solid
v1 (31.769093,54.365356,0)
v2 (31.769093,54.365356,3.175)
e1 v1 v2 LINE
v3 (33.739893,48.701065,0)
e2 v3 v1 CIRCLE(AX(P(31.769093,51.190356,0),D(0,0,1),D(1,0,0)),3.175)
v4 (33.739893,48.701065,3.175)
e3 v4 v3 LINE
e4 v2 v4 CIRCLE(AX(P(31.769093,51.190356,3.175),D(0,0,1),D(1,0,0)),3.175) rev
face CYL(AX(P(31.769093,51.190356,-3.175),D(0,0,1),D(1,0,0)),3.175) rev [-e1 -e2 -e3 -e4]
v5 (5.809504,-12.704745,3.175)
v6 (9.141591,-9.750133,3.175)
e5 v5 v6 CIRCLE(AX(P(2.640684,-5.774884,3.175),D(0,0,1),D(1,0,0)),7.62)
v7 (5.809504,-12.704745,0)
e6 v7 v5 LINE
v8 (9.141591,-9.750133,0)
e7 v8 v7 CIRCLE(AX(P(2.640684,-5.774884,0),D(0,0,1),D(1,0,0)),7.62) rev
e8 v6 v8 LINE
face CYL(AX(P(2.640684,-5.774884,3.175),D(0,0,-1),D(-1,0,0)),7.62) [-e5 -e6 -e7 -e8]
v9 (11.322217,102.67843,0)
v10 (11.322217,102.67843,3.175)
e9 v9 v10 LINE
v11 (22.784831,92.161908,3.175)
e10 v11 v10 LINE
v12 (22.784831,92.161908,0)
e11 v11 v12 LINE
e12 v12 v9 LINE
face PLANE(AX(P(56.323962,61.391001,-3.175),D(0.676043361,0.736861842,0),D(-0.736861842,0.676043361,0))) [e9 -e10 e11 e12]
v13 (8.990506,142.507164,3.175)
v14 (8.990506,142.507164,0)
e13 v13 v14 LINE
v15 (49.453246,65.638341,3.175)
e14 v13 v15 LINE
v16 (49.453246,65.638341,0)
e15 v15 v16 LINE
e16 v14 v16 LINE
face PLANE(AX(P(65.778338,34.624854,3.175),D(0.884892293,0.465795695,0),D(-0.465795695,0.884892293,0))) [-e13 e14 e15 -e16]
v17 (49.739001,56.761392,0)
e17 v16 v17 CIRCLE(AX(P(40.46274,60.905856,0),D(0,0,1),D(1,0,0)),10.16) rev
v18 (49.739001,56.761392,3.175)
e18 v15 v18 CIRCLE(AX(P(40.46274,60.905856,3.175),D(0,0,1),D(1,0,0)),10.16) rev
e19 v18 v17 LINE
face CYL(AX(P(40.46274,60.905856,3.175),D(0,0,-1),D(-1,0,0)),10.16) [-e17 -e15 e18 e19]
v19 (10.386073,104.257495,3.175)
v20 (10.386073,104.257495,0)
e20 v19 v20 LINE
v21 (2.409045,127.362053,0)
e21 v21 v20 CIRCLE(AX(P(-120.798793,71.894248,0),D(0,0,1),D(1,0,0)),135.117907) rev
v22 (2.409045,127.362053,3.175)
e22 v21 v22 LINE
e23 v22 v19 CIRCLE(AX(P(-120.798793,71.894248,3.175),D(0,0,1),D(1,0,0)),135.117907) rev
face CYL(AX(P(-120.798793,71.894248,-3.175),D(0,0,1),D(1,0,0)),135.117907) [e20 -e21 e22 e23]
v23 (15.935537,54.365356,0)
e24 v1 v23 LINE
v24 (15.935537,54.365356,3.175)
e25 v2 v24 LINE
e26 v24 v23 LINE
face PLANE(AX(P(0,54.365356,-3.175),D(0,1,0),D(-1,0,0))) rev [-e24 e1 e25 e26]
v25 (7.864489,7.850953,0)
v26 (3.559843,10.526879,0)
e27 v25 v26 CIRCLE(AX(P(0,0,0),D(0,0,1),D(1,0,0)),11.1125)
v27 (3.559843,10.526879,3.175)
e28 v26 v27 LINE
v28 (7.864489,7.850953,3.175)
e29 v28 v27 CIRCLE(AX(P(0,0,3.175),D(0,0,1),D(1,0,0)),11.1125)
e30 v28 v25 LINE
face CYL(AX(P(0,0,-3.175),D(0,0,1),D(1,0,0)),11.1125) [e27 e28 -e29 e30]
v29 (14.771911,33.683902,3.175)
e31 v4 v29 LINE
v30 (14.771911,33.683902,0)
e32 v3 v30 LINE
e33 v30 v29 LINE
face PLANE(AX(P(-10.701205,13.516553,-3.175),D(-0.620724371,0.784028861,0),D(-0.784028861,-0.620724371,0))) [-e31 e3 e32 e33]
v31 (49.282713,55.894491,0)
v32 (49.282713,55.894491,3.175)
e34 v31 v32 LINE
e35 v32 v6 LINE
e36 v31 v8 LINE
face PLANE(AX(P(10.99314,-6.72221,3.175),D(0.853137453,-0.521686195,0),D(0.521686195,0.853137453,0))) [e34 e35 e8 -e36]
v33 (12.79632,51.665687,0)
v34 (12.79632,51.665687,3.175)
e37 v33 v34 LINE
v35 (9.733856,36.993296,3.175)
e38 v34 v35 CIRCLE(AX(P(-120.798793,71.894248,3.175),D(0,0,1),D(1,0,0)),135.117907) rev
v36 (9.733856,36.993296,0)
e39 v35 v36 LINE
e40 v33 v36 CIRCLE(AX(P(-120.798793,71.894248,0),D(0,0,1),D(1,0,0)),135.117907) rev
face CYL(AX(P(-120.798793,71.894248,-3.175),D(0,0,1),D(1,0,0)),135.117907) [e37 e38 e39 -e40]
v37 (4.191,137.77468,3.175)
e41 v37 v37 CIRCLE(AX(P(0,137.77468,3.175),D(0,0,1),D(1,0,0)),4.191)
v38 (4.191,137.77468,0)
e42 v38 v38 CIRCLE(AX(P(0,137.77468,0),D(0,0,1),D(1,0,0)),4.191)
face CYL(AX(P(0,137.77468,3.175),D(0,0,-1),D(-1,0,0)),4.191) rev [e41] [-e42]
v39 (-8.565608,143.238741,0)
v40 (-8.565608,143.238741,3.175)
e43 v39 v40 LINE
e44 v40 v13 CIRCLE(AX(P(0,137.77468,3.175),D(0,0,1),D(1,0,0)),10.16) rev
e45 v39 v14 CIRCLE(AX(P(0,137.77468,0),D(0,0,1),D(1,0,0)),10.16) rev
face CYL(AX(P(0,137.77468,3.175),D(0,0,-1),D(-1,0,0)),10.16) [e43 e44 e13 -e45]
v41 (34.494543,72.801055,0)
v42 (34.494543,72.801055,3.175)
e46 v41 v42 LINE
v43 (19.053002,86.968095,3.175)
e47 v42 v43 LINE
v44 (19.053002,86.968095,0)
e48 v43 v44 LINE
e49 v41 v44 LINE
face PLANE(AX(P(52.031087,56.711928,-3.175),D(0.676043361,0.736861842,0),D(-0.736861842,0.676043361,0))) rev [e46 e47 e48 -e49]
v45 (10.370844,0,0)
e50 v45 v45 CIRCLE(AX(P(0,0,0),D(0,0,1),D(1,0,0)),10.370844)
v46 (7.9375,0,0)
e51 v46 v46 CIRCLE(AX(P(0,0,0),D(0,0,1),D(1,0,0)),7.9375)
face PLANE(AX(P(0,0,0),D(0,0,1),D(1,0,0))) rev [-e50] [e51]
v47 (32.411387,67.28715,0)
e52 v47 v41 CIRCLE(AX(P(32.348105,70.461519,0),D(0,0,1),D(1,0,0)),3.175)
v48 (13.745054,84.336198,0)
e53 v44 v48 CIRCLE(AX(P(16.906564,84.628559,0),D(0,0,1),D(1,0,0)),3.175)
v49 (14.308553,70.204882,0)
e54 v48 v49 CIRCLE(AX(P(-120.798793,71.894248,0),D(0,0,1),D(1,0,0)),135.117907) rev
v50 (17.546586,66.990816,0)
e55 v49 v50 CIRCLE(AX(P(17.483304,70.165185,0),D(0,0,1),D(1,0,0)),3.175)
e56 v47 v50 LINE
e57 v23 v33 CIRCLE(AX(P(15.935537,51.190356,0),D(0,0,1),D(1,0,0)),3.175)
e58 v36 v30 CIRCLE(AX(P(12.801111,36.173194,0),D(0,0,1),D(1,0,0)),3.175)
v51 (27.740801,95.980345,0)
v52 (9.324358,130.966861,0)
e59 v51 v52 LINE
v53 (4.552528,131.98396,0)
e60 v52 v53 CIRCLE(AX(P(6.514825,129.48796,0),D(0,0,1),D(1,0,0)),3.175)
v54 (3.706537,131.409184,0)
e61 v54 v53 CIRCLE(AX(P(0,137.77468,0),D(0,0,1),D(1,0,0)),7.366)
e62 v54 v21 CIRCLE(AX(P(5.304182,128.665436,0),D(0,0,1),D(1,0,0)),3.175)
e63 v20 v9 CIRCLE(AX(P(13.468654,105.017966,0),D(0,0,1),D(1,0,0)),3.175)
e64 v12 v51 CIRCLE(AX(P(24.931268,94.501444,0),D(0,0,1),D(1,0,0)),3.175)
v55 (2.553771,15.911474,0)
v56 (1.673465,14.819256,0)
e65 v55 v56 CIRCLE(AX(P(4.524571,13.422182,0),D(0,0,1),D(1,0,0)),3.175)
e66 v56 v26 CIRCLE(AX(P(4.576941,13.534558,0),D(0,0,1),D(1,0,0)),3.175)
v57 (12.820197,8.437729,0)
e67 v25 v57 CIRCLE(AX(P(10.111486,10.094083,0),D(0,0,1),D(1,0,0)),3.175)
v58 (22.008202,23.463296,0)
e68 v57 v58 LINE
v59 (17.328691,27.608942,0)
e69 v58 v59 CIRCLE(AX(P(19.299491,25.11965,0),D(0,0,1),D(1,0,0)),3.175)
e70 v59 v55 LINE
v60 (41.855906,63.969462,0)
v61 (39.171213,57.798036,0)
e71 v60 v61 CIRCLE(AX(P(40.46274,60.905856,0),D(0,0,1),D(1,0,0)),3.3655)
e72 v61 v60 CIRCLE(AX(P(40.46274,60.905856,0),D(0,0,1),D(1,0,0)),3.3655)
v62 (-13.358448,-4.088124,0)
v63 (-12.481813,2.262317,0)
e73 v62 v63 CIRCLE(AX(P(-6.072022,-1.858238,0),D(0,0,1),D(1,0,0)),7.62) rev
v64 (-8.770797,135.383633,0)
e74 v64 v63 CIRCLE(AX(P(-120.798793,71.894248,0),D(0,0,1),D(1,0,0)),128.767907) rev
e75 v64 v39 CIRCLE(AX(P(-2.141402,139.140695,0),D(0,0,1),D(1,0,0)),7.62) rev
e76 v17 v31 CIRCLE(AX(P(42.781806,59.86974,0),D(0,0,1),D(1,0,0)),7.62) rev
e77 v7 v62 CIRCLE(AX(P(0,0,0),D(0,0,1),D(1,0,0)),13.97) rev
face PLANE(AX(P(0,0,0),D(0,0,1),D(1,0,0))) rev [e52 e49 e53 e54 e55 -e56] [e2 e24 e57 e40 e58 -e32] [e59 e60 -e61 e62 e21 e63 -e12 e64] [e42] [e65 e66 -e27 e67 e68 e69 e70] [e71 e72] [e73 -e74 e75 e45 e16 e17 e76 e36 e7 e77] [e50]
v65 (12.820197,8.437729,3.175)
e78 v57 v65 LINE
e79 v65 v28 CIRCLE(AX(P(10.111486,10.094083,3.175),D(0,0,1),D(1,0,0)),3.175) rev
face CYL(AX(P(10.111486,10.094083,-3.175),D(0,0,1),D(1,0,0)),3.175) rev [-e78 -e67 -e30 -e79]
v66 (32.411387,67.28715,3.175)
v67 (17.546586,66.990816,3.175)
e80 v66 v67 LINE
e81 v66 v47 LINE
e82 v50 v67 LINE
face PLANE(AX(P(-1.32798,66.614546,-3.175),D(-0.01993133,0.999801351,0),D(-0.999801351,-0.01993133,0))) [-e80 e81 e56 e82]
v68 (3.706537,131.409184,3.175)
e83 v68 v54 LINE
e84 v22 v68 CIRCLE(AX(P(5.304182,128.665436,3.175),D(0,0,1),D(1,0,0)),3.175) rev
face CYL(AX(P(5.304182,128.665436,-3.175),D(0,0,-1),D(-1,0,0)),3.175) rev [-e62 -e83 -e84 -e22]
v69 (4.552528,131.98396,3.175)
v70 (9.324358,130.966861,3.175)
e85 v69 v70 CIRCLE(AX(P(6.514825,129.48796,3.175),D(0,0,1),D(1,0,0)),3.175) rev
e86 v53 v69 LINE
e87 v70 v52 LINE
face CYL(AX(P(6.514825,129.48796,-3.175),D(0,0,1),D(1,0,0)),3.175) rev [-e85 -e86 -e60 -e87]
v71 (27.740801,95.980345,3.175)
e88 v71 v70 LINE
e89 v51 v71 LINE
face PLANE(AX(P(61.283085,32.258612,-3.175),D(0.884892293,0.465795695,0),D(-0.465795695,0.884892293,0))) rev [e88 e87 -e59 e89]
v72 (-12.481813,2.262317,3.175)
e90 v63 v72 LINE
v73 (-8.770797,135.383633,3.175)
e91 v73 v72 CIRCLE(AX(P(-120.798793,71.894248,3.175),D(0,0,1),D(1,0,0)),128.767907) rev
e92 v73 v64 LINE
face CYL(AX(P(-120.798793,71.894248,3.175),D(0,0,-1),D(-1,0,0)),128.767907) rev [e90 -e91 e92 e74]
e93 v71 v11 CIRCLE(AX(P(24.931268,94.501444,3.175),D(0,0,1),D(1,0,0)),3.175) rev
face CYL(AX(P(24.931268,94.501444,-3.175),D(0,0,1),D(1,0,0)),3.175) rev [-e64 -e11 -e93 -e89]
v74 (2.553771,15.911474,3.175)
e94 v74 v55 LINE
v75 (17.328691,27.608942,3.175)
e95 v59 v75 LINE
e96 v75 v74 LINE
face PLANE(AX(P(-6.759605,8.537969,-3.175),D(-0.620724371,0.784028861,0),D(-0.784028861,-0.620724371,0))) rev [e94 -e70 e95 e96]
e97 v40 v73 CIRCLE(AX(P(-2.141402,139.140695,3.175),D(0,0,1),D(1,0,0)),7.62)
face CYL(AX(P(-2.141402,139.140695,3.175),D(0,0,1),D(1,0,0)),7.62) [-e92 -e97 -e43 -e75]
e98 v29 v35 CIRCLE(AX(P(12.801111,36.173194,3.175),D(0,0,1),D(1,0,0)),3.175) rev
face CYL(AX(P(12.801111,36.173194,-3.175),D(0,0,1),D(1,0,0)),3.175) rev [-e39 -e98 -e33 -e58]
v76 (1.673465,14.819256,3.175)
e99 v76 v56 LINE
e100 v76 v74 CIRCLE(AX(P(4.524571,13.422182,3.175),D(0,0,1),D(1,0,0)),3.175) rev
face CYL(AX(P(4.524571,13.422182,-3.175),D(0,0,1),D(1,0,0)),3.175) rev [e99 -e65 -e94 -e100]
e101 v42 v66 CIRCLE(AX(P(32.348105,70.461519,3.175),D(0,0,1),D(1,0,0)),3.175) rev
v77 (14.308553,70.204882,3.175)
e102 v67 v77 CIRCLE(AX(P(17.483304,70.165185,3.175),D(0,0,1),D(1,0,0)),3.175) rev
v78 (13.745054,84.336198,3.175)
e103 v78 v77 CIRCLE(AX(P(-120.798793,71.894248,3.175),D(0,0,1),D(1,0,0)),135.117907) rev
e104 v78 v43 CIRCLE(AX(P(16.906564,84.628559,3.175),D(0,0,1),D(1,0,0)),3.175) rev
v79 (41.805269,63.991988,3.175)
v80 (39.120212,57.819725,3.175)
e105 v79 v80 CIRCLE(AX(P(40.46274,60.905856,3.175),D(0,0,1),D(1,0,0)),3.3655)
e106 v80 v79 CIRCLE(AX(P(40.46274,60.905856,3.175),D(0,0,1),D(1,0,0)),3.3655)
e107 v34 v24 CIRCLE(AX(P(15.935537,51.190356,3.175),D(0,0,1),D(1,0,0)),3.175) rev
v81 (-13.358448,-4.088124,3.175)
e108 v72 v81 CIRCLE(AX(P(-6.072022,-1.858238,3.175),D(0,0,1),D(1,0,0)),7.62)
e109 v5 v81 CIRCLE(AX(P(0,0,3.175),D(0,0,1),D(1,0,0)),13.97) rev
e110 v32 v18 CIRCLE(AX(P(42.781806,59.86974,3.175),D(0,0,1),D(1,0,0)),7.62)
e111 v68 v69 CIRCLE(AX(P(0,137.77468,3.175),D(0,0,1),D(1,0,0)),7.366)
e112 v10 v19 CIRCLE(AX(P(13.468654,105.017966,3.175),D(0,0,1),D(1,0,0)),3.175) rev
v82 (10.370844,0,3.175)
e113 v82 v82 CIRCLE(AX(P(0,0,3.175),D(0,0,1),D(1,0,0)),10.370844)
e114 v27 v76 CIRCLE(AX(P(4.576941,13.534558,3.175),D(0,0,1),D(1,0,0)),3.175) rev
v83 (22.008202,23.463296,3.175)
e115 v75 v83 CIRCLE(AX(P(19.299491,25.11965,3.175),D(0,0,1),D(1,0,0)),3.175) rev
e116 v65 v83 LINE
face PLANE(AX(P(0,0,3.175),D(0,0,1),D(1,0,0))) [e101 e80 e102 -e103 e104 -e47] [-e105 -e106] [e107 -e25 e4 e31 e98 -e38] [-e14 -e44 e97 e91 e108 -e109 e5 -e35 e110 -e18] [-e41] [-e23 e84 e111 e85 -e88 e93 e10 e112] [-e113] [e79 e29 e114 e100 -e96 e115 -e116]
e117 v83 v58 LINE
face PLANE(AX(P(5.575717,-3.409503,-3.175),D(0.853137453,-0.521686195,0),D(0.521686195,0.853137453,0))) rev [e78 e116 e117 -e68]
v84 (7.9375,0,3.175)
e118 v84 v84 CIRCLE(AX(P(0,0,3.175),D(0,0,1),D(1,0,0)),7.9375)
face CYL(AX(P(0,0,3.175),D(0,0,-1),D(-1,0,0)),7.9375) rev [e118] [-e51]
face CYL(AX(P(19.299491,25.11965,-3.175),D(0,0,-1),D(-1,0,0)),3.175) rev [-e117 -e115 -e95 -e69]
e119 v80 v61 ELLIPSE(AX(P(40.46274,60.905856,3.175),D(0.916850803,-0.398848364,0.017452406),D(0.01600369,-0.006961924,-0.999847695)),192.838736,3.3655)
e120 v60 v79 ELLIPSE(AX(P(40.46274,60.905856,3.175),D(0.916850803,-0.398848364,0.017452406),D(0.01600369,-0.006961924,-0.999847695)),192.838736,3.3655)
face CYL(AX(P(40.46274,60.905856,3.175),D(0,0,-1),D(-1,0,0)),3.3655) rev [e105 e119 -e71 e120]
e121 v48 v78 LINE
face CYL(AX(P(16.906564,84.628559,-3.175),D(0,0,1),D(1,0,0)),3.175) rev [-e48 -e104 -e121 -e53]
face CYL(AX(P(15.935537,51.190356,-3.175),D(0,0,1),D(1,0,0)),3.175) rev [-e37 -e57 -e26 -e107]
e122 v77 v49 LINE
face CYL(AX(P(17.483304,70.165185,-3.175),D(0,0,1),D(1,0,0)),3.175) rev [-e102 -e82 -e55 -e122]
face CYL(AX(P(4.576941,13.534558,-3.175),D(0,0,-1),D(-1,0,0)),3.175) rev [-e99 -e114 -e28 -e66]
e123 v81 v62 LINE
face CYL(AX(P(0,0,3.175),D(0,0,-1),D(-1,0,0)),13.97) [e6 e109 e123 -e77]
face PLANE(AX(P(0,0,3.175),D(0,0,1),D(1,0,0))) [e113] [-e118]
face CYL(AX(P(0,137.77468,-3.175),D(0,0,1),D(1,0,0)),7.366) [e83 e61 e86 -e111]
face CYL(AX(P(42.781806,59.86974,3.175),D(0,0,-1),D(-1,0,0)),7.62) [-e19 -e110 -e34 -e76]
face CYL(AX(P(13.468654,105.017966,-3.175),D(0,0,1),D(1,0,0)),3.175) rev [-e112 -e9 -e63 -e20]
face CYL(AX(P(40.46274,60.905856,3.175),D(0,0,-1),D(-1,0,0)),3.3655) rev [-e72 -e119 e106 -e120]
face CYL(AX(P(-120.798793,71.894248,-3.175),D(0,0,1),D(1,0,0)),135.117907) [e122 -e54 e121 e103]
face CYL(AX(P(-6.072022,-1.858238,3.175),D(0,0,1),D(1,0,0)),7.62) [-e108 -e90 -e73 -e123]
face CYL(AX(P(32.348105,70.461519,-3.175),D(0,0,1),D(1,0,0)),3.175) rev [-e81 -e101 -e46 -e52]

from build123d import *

# Parameters (mm, degrees)
SKETCH1_R           = 7.9375
SKETCH1_R_2         = 3.3655
SKETCH1_R_3         = 4.191
BOSS_EXTRUDE1_DEPTH = 3.175
CUT_EXTRUDE1_DEPTH  = 6.35
FILLET1_R           = 3.175
FILLET5_R           = 7.62


with BuildPart() as part:
    # Sketch1 → Boss-Extrude1 (new body)
    with BuildSketch(Plane.XY):
        with BuildLine():
            Line((8.990505701, 142.507164257), (49.453246099, 65.638340515))
            ThreePointArc((49.453246099, 65.638340515), (50.622740399, 60.905856258), (49.453246099, 56.173372001))
            Line((49.453246099, 56.173372001), (8.177790267, -11.326281223))
            ThreePointArc((8.177790267, -11.326281223), (-6.360706327, -12.437938536), (-13.97, 0))
            ThreePointArc((-13.97, 0), (7.91990549, 68.33468047), (-10.16, 137.77468))
            ThreePointArc((-10.16, 137.77468), (-2.437423033, 147.637974022), (8.990505701, 142.507164257))
        make_face()
        Circle(SKETCH1_R, mode=Mode.SUBTRACT)
        with Locations((40.462740399, 60.905856258)):
            Circle(SKETCH1_R_2, mode=Mode.SUBTRACT)
        with Locations((0, 137.77468)):
            Circle(SKETCH1_R_3, mode=Mode.SUBTRACT)
    extrude(amount=BOSS_EXTRUDE1_DEPTH)

    # Sketch2 → Cut-Extrude1 (cut)
    with BuildSketch(Plane.XY.offset(3.175)):
        with BuildLine():
            ThreePointArc((-0.124257687, 11.111805266), (6.119551738, 9.275707131), (10.264347662, 4.258030452))
            Line((10.264347662, 4.258030452), (31.313727824, 38.681050934))
            Line((31.313727824, 38.681050934), (1.961287607, 15.442397513))
            ThreePointArc((1.961287607, 15.442397513), (0.937773258, 13.267826895), (-0.124257687, 11.111805266))
        make_face()
        with BuildLine():
            Line((6.763206822, 27.343322009), (40.914079215, 54.38094756))
            ThreePointArc((40.914079215, 54.38094756), (40.688544415, 54.369255246), (40.462740399, 54.365356258))
            Line((40.462740399, 54.365356258), (13.177274796, 54.365356258))
            ThreePointArc((13.177274796, 54.365356258), (10.666365072, 40.689104041), (6.763206822, 27.343322009))
        make_face()
        with BuildLine():
            Line((14.227692925, 66.924652484), (40.332379532, 67.445056996))
            Line((40.332379532, 67.445056996), (12.691282428, 92.804736539))
            ThreePointArc((12.691282428, 92.804736539), (14.081637817, 79.901629399), (14.227692925, 66.924652484))
        make_face()
        with BuildLine():
            Line((10.611239694, 103.330724773), (36.257061309, 79.801636355))
            Line((36.257061309, 79.801636355), (6.979807085, 135.420906636))
            ThreePointArc((6.979807085, 135.420906636), (4.67858985, 132.085325641), (0.961351613, 130.471683418))
            ThreePointArc((0.961351613, 130.471683418), (6.511625183, 117.159092878), (10.611239694, 103.330724773))
        make_face()
    extrude(amount=-CUT_EXTRUDE1_DEPTH, mode=Mode.SUBTRACT)

    # Fillet1
    # the kernel refuses this fillet: 3.175 mm, written as the material it adds along each edge
    with BuildSketch(Plane(origin=(1.961287607, 15.442397513, 3.175), x_dir=(-0.42030668038784, -0.9073821104812206, 0), z_dir=(0, 0, -1))) as fillet1_piece_1:
        with BuildLine():
            CenterArc((0.755742265, -3.174987871), FILLET1_R, 90.158373023, 26.618624782)
            Line((-0.674656078, -0.340453415), (0, 0))
            ThreePointArc((0, 0), (0.373483081, -0.000516178), (0.746966162, 0))
        make_face()
    extrude(amount=3.175)
    with BuildSketch(Plane(origin=(-0.124257687, 11.111805266, 3.175), x_dir=(0.4359761911813302, 0.8999581994309626, 0), z_dir=(0, 0, -1))) as fillet1_piece_2:
        with BuildLine():
            CenterArc((4.22998716, 3.174619998), FILLET1_R, 172.83641486, 96.277116616)
            ThreePointArc((1.07977071, 3.570550945), (0.690776023, 1.739644609), (0, 0))
            ThreePointArc((0, 0), (2.090433086, 0.016171698), (4.180866173, 0))
        make_face()
    extrude(amount=3.175)
    with BuildSketch(Plane(origin=(10.264347662, 4.258030452, 3.175), x_dir=(0.5216861951219568, 0.853137453063207, 0), z_dir=(0, 0, -1))) as fillet1_piece_3:
        with BuildLine():
            CenterArc((4.899209013, -3.175), FILLET1_R, 90, 103.603922827)
            ThreePointArc((1.813283958, -3.921787493), (1.099083544, -1.871916155), (0, 0))
            Line((0, 0), (4.899209013, 0))
        make_face()
    extrude(amount=3.175)
    with BuildSketch(Plane(origin=(31.313727824, 38.681050934, 3.175), x_dir=(-0.7840288614357019, -0.6207243707442435, 0), z_dir=(0, 0, -1))) as fillet1_piece_4:
        with BuildLine():
            CenterArc((FILLET1_R * 5.61807899766, -FILLET1_R), FILLET1_R, 90, 159.814477423)
            Line((FILLET1_R * 5.27301794688, -FILLET1_R * 1.9385802423), (0, 0))
            Line((0, 0), (FILLET1_R * 5.61807899766, 0))
        make_face()
    extrude(amount=3.175)
    with BuildSketch(Plane(origin=(40.914079215, 54.38094756, 3.175), x_dir=(-0.9999985466583668, -0.0017048991624346568, 0), z_dir=(0, 0, -1))) as fillet1_piece_5:
        with BuildLine():
            CenterArc((9.150412322, -3.174995386), FILLET1_R, 90.097683574, 141.630948821)
            Line((7.1838593, -5.667643418), (6.987203998, -5.916908221))
            Line((6.987203998, -5.916908221), (-0.196655302, -0.249264803))
            Line((-0.196655302, -0.249264803), (0.021369604, 0.316780034))
            ThreePointArc((0.021369604, 0.316780034), (0.450823437, 0.302677747), (9.144457961, 0.317499539))
            Line((9.144457961, 0.317499539), (9.144999267, 0))
        make_face()
    extrude(amount=3.175)
    with BuildSketch(Plane(origin=(6.763206822, 27.343322009, 3.175), x_dir=(0.29421486221715376, 0.9557393027654252, 0), z_dir=(0, 0, -1))) as fillet1_piece_6:
        with BuildLine():
            CenterArc((10.215496918, 3.172783065), FILLET1_R, 124.520485767, 143.338263429)
            Line((8.41622168, 5.788740561), (0, 0))
            ThreePointArc((0, 0), (5.048434414, 0.094345715), (10.096868828, 0))
        make_face()
    extrude(amount=3.175)
    with BuildSketch(Plane(origin=(13.177274796, 54.365356258, 3.175), x_dir=(-0.1397274976091422, -0.9901899951079526, 0), z_dir=(0, 0, -1))) as fillet1_piece_7:
        with BuildLine():
            CenterArc((2.758448164, -3.174838407), FILLET1_R, 90.57806828, 81.3898537)
            Line((-0.38540507, -2.731203602), (0, 0))
            ThreePointArc((0, 0), (1.363207757, -0.006876893), (2.726415514, 0))
        make_face()
    extrude(amount=3.175)
    with BuildSketch(Plane(origin=(12.691282428, 92.804736539, 3.175), x_dir=(0.12348134501551586, -0.992346893698549, 0), z_dir=(0, 0, -1))) as fillet1_piece_8:
        with BuildLine():
            CenterArc((8.634113181, -3.173416471), FILLET1_R, 91.809659599, 137.818629886)
            Line((6.577526563, -5.59231632), (0, 0))
            ThreePointArc((0, 0), (4.266924504, -0.06738998), (8.533849008, 0))
        make_face()
    extrude(amount=3.175)
    with BuildSketch(Plane(origin=(14.227692925, 66.924652484, 3.175), x_dir=(0.024643115282951916, 0.9996963123214726, 0), z_dir=(0, 0, -1))) as fillet1_piece_9:
        with BuildLine():
            CenterArc((3.319776694, 3.174765946), FILLET1_R, 177.445853815, 91.858439002)
            Line((0.147930885, 3.316255051), (0, 0))
            ThreePointArc((0, 0), (1.640612791, 0.009960595), (3.281225581, 0))
        make_face()
    extrude(amount=3.175)
    with BuildSketch(Plane(origin=(40.332379532, 67.445056996, 3.175), x_dir=(-0.7368618420904852, 0.6760433607920552, 0), z_dir=(0, 0, -1))) as fillet1_piece_10:
        with BuildLine():
            CenterArc((FILLET1_R * 2.49529647453, -FILLET1_R), FILLET1_R, 90, 136.322717601)
            Line((FILLET1_R * 1.80470077201, -FILLET1_R * 1.72324102183), (0, 0))
            Line((0, 0), (FILLET1_R * 2.49529647453, 0))
        make_face()
    extrude(amount=3.175)
    with BuildSketch(Plane(origin=(36.257061309, 79.801636355, 3.175), x_dir=(-0.736861842090485, 0.6760433607920552, 0), z_dir=(0, 0, -1))) as fillet1_piece_11:
        with BuildLine():
            CenterArc((FILLET1_R * 5.75850458875, FILLET1_R), FILLET1_R, 109.70304414, 160.29695586)
            Line((FILLET1_R * 5.42135931021, FILLET1_R * 1.94145263352), (0, 0))
            Line((0, 0), (FILLET1_R * 5.75850458875, 0))
        make_face()
    extrude(amount=3.175)
    with BuildSketch(Plane(origin=(10.611239694, 103.330724773, 3.175), x_dir=(0.7368618420904525, -0.6760433607920909, 0), z_dir=(0, 0, -1))) as fillet1_piece_12:
        with BuildLine():
            CenterArc((0.964871334, -3.175), FILLET1_R, 90, 33.606646982)
            ThreePointArc((-0.792453619, -0.530678913), (-0.395758583, -0.266038651), (0, 0))
            Line((0, 0), (0.964871334, 0))
        make_face()
    extrude(amount=3.175)
    with BuildSketch(Plane(origin=(0.961351613, 130.471683418, 3.175), x_dir=(0.42205519537851754, -0.9065701363126856, 0), z_dir=(0, 0, -1))) as fillet1_piece_13:
        with BuildLine():
            CenterArc((3.47040448, -3.174744224), FILLET1_R, 90.727275071, 84.025505032)
            ThreePointArc((0.308709742, -2.884379996), (0.297748154, -1.426842886), (0, 0))
            ThreePointArc((0, 0), (1.715052097, -0.01088502), (3.430104193, 0))
        make_face()
    extrude(amount=3.175)
    with BuildSketch(Plane(origin=(6.979807085, 135.420906636, 3.175), x_dir=(-0.5768732919878915, -0.8168336458490512, 0), z_dir=(0, 0, -1))) as fillet1_piece_14:
        with BuildLine():
            CenterArc((5.114466288, -3.042745801), FILLET1_R, 106.595474978, 100.411869016)
            Line((2.285705354, -4.484528231), (0, 0))
            ThreePointArc((0, 0), (2.103823012, -0.306829742), (4.207646024, 0))
        make_face()
    extrude(amount=3.175)

    # Fillet5
    # the kernel refuses this fillet: 7.62 mm, written as the material it takes off along each edge
    with BuildSketch(Plane(origin=(49.453246099, 56.173372001, -1.634441158), x_dir=(0.4370839848417488, 0.8994206970016078, 0), z_dir=(0, 0, 1))) as fillet5_piece_1:
        with BuildLine():
            CenterArc((0.40861029, 7.616054986), FILLET5_R, 264.472549142, 7.371205669)
            Line((-0.325368255, 0.031486739), (0, 0))
            ThreePointArc((0, 0), (0.326888232, -0.005260019), (0.653776463, 0))
        make_face()
    extrude(amount=6.443882317, mode=Mode.SUBTRACT)
    with BuildSketch(Plane(origin=(8.177790267, -11.326281223, -6.850611907), x_dir=(-0.8642606797046686, -0.5030442103000734, 0), z_dir=(0, 0, 1))) as fillet5_piece_2:
        with BuildLine():
            CenterArc((1.992905282, -7.583263394), FILLET5_R, 84.371608536, 33.981356684)
            Line((-1.625847463, -0.877368333), (0, 0))
            ThreePointArc((0, 0), (1.370122381, 0.067350445), (2.740244763, 0))
        make_face()
    extrude(amount=16.876223814, mode=Mode.SUBTRACT)
    with BuildSketch(Plane(origin=(-13.97, 0, -10.334031649), x_dir=(0.5495701737634485, 0.8354475591619218, 0), z_dir=(0, 0, 1))) as fillet5_piece_3:
        with BuildLine():
            CenterArc((2.78803259, -7.619578759), FILLET5_R, 90.602458764, 49.750903142)
            ThreePointArc((-3.079322695, -2.757630389), (-1.64222079, -1.264291645), (0, 0))
            ThreePointArc((0, 0), (1.353955306, -0.00711841), (2.707910612, 0))
        make_face()
    extrude(amount=23.843063299, mode=Mode.SUBTRACT)
    with BuildSketch(Plane(origin=(-10.16, 137.77468, -14.229821855), x_dir=(0.28011460344612044, 0.9599665665720981, 0), z_dir=(0, 0, 1))) as fillet5_piece_4:
        with BuildLine():
            CenterArc((3.557455464, -7.314945237), FILLET5_R, 73.732955283, 62.075524842)
            ThreePointArc((-1.906189574, -2.003355748), (-0.947716818, -1.006795003), (0, 0))
            ThreePointArc((0, 0), (2.845964371, 0.406739684), (5.691928742, 0))
        make_face()
    extrude(amount=31.63464371, mode=Mode.SUBTRACT)


solid = part.part
